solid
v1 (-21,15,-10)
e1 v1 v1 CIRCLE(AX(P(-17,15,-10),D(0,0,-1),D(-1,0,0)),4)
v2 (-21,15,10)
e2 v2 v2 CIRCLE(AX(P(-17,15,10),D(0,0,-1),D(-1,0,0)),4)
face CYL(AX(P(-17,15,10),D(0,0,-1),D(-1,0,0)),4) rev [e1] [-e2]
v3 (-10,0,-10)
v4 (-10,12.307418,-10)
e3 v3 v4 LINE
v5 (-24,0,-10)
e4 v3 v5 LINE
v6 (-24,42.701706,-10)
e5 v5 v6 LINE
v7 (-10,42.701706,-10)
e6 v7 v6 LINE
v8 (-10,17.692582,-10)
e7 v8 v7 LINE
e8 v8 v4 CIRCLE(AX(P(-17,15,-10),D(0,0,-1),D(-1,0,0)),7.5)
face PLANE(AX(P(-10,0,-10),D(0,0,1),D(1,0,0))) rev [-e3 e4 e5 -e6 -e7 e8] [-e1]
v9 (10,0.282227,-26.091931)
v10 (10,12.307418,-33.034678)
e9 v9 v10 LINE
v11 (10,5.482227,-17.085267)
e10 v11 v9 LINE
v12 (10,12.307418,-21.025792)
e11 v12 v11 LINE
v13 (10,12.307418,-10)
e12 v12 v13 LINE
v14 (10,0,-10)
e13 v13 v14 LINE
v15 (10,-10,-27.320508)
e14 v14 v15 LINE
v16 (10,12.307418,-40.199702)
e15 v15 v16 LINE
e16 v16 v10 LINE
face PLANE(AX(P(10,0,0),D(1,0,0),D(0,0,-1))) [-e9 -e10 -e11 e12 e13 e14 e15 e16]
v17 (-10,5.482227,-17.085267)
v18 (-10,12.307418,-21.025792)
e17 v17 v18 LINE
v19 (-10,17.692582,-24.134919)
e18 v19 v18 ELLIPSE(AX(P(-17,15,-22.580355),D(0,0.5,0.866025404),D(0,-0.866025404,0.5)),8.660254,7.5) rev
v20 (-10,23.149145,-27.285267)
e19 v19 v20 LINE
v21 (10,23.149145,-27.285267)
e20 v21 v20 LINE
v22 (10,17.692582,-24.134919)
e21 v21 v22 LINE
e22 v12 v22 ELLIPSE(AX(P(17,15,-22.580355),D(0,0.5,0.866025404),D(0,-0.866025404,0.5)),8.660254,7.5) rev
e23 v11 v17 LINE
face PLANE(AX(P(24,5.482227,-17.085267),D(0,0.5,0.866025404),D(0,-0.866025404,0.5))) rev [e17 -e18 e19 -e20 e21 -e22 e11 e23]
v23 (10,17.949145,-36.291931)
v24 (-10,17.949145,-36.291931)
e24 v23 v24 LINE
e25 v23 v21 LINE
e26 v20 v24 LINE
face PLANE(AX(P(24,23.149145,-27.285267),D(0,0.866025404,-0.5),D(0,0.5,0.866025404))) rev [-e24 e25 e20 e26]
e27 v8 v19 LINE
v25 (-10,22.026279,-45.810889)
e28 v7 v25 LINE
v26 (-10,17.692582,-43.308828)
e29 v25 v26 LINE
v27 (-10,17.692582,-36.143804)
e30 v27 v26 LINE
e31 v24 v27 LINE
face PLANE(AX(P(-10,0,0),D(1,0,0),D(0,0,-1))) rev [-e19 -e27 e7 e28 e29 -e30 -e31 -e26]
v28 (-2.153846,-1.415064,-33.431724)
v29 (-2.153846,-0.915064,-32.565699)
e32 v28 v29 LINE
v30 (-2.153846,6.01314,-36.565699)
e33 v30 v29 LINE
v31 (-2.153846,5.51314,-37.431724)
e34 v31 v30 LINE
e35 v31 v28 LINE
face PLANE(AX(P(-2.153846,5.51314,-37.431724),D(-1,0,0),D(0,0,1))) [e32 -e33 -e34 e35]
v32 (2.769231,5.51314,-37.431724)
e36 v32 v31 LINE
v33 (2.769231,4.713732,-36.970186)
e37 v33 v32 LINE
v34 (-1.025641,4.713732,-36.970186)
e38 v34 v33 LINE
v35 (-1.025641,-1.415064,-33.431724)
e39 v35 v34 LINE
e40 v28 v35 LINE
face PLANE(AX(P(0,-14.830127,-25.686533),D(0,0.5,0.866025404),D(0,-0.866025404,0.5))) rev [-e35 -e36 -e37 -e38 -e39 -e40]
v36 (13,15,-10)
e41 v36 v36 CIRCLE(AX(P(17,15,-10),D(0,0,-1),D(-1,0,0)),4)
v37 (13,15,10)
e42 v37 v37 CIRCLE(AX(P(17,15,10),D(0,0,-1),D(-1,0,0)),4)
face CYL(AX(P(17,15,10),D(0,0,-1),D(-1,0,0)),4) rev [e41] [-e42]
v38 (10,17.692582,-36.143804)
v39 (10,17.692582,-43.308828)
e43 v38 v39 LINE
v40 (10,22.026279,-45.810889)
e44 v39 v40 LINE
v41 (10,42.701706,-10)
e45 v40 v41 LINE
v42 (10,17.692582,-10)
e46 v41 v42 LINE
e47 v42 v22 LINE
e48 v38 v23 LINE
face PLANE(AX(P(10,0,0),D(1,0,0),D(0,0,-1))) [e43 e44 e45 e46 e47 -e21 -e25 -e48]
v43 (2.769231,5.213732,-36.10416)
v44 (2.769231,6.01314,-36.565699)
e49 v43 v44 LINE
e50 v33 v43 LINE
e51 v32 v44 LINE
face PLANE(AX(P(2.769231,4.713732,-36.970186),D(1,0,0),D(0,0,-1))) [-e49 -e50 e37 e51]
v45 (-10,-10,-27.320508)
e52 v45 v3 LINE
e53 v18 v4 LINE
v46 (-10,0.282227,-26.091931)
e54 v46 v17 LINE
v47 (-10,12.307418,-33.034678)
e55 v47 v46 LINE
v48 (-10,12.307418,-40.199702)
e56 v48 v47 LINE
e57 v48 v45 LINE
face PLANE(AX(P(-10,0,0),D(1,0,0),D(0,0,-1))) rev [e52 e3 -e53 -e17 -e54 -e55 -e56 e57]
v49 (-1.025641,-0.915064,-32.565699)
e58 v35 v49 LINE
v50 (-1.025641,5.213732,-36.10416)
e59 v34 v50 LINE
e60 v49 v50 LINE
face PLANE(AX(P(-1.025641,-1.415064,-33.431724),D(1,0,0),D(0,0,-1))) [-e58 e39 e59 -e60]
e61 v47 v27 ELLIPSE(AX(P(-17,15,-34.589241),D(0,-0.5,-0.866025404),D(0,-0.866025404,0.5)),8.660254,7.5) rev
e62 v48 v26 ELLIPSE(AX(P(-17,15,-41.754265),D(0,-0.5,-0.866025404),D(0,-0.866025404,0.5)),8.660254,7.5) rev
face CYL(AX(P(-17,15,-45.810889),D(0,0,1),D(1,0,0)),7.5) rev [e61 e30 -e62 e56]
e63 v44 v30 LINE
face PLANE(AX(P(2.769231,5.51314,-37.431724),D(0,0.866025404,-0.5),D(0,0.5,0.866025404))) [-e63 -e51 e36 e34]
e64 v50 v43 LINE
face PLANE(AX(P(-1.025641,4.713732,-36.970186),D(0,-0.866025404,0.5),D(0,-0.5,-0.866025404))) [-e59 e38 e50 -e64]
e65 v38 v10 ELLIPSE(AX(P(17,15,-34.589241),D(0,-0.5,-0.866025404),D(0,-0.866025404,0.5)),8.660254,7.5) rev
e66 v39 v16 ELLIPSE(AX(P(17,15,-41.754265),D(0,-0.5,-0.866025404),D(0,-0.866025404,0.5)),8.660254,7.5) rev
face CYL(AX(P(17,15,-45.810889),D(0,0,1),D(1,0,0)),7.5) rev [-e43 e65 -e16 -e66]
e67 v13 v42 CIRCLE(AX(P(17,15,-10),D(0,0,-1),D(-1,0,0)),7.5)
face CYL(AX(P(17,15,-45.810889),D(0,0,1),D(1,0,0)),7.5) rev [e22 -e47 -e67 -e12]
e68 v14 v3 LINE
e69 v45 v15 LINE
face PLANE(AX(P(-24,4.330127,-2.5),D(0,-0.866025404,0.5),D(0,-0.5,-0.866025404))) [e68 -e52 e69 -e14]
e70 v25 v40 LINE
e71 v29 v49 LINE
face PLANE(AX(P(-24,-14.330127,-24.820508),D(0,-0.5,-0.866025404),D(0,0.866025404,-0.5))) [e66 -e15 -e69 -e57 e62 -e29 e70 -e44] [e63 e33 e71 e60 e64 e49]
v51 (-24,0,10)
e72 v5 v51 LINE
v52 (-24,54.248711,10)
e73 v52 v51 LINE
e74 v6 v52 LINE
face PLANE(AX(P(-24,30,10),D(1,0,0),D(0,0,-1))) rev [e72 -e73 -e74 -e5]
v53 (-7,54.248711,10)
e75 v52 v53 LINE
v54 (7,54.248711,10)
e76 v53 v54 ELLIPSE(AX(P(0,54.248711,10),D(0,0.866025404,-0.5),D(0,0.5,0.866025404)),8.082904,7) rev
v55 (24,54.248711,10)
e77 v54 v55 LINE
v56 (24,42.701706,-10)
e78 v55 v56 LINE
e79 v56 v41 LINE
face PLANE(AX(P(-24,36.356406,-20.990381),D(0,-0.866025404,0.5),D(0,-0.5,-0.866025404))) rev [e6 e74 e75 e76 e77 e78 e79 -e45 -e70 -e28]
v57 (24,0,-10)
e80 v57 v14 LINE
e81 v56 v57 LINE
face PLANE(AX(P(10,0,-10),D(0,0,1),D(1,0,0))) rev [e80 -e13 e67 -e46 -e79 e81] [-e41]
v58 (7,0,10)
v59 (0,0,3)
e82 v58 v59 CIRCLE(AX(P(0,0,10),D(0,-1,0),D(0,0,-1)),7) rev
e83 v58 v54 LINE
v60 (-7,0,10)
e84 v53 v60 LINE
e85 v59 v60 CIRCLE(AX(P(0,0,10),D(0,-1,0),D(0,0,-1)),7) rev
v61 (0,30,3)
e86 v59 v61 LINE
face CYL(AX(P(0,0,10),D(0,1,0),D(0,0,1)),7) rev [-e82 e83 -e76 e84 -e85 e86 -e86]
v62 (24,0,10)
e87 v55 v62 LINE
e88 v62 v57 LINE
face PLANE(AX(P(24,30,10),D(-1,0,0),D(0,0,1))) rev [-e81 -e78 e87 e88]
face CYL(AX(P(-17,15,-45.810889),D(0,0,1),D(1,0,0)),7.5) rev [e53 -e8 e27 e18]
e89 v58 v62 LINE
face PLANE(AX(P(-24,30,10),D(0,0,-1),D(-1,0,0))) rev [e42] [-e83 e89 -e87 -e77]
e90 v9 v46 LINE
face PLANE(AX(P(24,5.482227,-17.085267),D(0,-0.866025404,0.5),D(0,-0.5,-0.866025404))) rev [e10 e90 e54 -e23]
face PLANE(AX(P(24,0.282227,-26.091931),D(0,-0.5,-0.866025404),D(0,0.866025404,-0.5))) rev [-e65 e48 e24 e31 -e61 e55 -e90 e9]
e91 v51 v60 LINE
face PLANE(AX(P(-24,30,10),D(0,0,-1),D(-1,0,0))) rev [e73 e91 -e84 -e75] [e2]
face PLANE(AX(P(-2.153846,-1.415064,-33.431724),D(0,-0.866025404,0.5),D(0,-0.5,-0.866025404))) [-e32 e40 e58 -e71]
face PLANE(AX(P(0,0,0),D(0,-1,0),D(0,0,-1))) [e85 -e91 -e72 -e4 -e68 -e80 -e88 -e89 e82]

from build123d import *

# Parameters (mm, degrees)
SKETCH_1_W              = 48
SKETCH_1_H              = 20
EXTRUDE_1_DEPTH         = 30
SKETCH_2_W              = 14
SKETCH_2_H              = 30
CUT_EXTRUDE_1_DEPTH     = 7
EXTRUDE_2_DEPTH         = 48
CUT_EXTRUDE_2_DEPTH     = 14
CUT_EXTRUDE_3_DEPTH     = 14
CUT_EXTRUDE_4_DEPTH     = 65.456478054
SKETCH_13_R             = 4
CUT_EXTRUDE_5_DEPTH     = 53.52066051
SKETCH_14_R             = 4
CUT_EXTRUDE_6_DEPTH     = 53.52066051
FILLET_1_R              = 7
EXTRUDE_5_DEPTH         = 1
SKETCH_20_R             = 7.5
CUT_EXTRUDE_8_DEPTH     = 53.52066051
BOSS_EXTRUDE1_DEPTH     = 25
CUT_EXTRUDE1_DEPTH      = 80.244164221
CUT_EXTRUDE1_DEPTH_BACK = 80.244164221


with BuildPart() as part:
    # Эскиз1 → Бобышка-Вытянуть1 (new body)
    with BuildSketch(Plane(origin=(0, 0, 0), x_dir=(1, 0, 0), z_dir=(0, 1, 0))):
        Rectangle(SKETCH_1_W, SKETCH_1_H)
    extrude(amount=EXTRUDE_1_DEPTH)

    # Эскиз2 → Вырез-Вытянуть1 (cut)
    with BuildSketch(Plane.XY.offset(10)):
        with Locations((0, 15)):
            Rectangle(SKETCH_2_W, SKETCH_2_H)
    extrude(amount=-CUT_EXTRUDE_1_DEPTH, mode=Mode.SUBTRACT)

    # Эскиз7 → Бобышка-Вытянуть2 (add)
    with BuildSketch(Plane(origin=(24, 0, 0), x_dir=(0, 0, -1), z_dir=(1, 0, 0))):
        Polygon((10, 0), (27.320508076, -10), (45.810889132, 22.026279442), (32, 30), (10, 30), align=None)
    extrude(amount=-EXTRUDE_2_DEPTH)

    # Эскиз8 → Вырез-Вытянуть2 (cut)
    with BuildSketch(Plane(origin=(24, 0, 0), x_dir=(0, 0, -1), z_dir=(1, 0, 0))):
        Polygon((10, 0), (10, 30), (32, 30), (45.810889132, 22.026279442), (27.320508076, -10), align=None)
    extrude(amount=-CUT_EXTRUDE_2_DEPTH, mode=Mode.SUBTRACT)

    # Эскиз9 → Вырез-Вытянуть3 (cut)
    with BuildSketch(Plane.ZY.offset(24)):
        Polygon((-10, 0), (-10, 30), (-32, 30), (-45.810889132, 22.026279442), (-27.320508076, -10), align=None)
    extrude(amount=-CUT_EXTRUDE_3_DEPTH, mode=Mode.SUBTRACT)

    # Эскиз11 → Вырез-Вытянуть4 (cut, through all)
    with BuildSketch(Plane.ZY.offset(10)):
        Polygon((-17.085266521, 5.482226936), (-27.285266521, 23.149145173), (-36.291930721, 17.949145173), (-26.091930721, 0.282226936), align=None)
    extrude(amount=-CUT_EXTRUDE_4_DEPTH, mode=Mode.SUBTRACT)

    # Эскиз13 → Вырез-Вытянуть5 (cut, through all)
    with BuildSketch(Plane(origin=(0, 0, -10), x_dir=(-1, 0, 0), z_dir=(0, 0, -1))):
        with Locations((17, 15)):
            Circle(SKETCH_13_R)
    extrude(amount=-CUT_EXTRUDE_5_DEPTH, mode=Mode.SUBTRACT)

    # Эскиз14 → Вырез-Вытянуть6 (cut, through all)
    with BuildSketch(Plane(origin=(0, 0, -10), x_dir=(-1, 0, 0), z_dir=(0, 0, -1))):
        with Locations((-17, 15)):
            Circle(SKETCH_14_R)
    extrude(amount=-CUT_EXTRUDE_6_DEPTH, mode=Mode.SUBTRACT)

    # Скругление1
    fillet_1_edges = [part.edges().sort_by_distance(p)[0] for p in [
        (-7, 15, 3),
        (7, 15, 3),
    ]]
    fillet(fillet_1_edges, radius=FILLET_1_R - 0.0001)  # a hair under: the kernel refuses the full size

    # Эскиз18 → Бобышка-Вытянуть5 (add)
    with BuildSketch(Plane(origin=(0, -14.330127019, -24.820508076), x_dir=(-1, 0, 0), z_dir=(0, -0.4999999999999885, -0.8660254037844454))):
        Polygon((2.153846154, 23.490381057), (2.153846154, 15.490381057), (1.025641026, 15.490381057), (1.025641026, 22.567304134), (-2.769230769, 22.567304134), (-2.769230769, 23.490381057), align=None)
    extrude(amount=EXTRUDE_5_DEPTH)

    # Эскиз20 → Вырез-Вытянуть8 (cut, through all)
    with BuildSketch(Plane(origin=(0, 0, -10), x_dir=(-1, 0, 0), z_dir=(0, 0, -1))):
        with Locations((-17, 15)):
            Circle(SKETCH_20_R)
        with Locations((17, 15)):
            Circle(SKETCH_20_R)
    extrude(amount=CUT_EXTRUDE_8_DEPTH, mode=Mode.SUBTRACT)

    # Sketch3 → Boss-Extrude1 (add)
    with BuildSketch(Plane(origin=(0, 30, 0), x_dir=(1, 0, 0), z_dir=(0, 1, 0))):
        with BuildLine():
            Line((7, -10), (24, -10))
            Line((24, -10), (24, 10))
            Line((24, 10), (10, 10))
            Line((10, 10), (10, 32))
            Line((10, 32), (-10, 32))
            Line((-10, 32), (-10, 10))
            Line((-10, 10), (-24, 10))
            Line((-24, 10), (-24, -10))
            Line((-24, -10), (-7, -10))
            ThreePointArc((-7, -10), (0, -3), (7, -10))
        make_face()
    extrude(amount=BOSS_EXTRUDE1_DEPTH)

    # Sketch4 → Cut-Extrude1 (cut, two sides: drawn at the far end of the back side and taken through both)
    with BuildSketch(Plane.ZY.offset(10).offset(-CUT_EXTRUDE1_DEPTH_BACK)):
        Polygon((-251.050138341, -96.468656337), (-45.810889132, 22.026279442), (35.63071017, 69.046608722), (240.869959379, 187.541544501), (3.880087821, 598.020042918), (-488.040009899, 314.00984208), align=None)
    extrude(amount=CUT_EXTRUDE1_DEPTH + CUT_EXTRUDE1_DEPTH_BACK, mode=Mode.SUBTRACT)


solid = part.part
